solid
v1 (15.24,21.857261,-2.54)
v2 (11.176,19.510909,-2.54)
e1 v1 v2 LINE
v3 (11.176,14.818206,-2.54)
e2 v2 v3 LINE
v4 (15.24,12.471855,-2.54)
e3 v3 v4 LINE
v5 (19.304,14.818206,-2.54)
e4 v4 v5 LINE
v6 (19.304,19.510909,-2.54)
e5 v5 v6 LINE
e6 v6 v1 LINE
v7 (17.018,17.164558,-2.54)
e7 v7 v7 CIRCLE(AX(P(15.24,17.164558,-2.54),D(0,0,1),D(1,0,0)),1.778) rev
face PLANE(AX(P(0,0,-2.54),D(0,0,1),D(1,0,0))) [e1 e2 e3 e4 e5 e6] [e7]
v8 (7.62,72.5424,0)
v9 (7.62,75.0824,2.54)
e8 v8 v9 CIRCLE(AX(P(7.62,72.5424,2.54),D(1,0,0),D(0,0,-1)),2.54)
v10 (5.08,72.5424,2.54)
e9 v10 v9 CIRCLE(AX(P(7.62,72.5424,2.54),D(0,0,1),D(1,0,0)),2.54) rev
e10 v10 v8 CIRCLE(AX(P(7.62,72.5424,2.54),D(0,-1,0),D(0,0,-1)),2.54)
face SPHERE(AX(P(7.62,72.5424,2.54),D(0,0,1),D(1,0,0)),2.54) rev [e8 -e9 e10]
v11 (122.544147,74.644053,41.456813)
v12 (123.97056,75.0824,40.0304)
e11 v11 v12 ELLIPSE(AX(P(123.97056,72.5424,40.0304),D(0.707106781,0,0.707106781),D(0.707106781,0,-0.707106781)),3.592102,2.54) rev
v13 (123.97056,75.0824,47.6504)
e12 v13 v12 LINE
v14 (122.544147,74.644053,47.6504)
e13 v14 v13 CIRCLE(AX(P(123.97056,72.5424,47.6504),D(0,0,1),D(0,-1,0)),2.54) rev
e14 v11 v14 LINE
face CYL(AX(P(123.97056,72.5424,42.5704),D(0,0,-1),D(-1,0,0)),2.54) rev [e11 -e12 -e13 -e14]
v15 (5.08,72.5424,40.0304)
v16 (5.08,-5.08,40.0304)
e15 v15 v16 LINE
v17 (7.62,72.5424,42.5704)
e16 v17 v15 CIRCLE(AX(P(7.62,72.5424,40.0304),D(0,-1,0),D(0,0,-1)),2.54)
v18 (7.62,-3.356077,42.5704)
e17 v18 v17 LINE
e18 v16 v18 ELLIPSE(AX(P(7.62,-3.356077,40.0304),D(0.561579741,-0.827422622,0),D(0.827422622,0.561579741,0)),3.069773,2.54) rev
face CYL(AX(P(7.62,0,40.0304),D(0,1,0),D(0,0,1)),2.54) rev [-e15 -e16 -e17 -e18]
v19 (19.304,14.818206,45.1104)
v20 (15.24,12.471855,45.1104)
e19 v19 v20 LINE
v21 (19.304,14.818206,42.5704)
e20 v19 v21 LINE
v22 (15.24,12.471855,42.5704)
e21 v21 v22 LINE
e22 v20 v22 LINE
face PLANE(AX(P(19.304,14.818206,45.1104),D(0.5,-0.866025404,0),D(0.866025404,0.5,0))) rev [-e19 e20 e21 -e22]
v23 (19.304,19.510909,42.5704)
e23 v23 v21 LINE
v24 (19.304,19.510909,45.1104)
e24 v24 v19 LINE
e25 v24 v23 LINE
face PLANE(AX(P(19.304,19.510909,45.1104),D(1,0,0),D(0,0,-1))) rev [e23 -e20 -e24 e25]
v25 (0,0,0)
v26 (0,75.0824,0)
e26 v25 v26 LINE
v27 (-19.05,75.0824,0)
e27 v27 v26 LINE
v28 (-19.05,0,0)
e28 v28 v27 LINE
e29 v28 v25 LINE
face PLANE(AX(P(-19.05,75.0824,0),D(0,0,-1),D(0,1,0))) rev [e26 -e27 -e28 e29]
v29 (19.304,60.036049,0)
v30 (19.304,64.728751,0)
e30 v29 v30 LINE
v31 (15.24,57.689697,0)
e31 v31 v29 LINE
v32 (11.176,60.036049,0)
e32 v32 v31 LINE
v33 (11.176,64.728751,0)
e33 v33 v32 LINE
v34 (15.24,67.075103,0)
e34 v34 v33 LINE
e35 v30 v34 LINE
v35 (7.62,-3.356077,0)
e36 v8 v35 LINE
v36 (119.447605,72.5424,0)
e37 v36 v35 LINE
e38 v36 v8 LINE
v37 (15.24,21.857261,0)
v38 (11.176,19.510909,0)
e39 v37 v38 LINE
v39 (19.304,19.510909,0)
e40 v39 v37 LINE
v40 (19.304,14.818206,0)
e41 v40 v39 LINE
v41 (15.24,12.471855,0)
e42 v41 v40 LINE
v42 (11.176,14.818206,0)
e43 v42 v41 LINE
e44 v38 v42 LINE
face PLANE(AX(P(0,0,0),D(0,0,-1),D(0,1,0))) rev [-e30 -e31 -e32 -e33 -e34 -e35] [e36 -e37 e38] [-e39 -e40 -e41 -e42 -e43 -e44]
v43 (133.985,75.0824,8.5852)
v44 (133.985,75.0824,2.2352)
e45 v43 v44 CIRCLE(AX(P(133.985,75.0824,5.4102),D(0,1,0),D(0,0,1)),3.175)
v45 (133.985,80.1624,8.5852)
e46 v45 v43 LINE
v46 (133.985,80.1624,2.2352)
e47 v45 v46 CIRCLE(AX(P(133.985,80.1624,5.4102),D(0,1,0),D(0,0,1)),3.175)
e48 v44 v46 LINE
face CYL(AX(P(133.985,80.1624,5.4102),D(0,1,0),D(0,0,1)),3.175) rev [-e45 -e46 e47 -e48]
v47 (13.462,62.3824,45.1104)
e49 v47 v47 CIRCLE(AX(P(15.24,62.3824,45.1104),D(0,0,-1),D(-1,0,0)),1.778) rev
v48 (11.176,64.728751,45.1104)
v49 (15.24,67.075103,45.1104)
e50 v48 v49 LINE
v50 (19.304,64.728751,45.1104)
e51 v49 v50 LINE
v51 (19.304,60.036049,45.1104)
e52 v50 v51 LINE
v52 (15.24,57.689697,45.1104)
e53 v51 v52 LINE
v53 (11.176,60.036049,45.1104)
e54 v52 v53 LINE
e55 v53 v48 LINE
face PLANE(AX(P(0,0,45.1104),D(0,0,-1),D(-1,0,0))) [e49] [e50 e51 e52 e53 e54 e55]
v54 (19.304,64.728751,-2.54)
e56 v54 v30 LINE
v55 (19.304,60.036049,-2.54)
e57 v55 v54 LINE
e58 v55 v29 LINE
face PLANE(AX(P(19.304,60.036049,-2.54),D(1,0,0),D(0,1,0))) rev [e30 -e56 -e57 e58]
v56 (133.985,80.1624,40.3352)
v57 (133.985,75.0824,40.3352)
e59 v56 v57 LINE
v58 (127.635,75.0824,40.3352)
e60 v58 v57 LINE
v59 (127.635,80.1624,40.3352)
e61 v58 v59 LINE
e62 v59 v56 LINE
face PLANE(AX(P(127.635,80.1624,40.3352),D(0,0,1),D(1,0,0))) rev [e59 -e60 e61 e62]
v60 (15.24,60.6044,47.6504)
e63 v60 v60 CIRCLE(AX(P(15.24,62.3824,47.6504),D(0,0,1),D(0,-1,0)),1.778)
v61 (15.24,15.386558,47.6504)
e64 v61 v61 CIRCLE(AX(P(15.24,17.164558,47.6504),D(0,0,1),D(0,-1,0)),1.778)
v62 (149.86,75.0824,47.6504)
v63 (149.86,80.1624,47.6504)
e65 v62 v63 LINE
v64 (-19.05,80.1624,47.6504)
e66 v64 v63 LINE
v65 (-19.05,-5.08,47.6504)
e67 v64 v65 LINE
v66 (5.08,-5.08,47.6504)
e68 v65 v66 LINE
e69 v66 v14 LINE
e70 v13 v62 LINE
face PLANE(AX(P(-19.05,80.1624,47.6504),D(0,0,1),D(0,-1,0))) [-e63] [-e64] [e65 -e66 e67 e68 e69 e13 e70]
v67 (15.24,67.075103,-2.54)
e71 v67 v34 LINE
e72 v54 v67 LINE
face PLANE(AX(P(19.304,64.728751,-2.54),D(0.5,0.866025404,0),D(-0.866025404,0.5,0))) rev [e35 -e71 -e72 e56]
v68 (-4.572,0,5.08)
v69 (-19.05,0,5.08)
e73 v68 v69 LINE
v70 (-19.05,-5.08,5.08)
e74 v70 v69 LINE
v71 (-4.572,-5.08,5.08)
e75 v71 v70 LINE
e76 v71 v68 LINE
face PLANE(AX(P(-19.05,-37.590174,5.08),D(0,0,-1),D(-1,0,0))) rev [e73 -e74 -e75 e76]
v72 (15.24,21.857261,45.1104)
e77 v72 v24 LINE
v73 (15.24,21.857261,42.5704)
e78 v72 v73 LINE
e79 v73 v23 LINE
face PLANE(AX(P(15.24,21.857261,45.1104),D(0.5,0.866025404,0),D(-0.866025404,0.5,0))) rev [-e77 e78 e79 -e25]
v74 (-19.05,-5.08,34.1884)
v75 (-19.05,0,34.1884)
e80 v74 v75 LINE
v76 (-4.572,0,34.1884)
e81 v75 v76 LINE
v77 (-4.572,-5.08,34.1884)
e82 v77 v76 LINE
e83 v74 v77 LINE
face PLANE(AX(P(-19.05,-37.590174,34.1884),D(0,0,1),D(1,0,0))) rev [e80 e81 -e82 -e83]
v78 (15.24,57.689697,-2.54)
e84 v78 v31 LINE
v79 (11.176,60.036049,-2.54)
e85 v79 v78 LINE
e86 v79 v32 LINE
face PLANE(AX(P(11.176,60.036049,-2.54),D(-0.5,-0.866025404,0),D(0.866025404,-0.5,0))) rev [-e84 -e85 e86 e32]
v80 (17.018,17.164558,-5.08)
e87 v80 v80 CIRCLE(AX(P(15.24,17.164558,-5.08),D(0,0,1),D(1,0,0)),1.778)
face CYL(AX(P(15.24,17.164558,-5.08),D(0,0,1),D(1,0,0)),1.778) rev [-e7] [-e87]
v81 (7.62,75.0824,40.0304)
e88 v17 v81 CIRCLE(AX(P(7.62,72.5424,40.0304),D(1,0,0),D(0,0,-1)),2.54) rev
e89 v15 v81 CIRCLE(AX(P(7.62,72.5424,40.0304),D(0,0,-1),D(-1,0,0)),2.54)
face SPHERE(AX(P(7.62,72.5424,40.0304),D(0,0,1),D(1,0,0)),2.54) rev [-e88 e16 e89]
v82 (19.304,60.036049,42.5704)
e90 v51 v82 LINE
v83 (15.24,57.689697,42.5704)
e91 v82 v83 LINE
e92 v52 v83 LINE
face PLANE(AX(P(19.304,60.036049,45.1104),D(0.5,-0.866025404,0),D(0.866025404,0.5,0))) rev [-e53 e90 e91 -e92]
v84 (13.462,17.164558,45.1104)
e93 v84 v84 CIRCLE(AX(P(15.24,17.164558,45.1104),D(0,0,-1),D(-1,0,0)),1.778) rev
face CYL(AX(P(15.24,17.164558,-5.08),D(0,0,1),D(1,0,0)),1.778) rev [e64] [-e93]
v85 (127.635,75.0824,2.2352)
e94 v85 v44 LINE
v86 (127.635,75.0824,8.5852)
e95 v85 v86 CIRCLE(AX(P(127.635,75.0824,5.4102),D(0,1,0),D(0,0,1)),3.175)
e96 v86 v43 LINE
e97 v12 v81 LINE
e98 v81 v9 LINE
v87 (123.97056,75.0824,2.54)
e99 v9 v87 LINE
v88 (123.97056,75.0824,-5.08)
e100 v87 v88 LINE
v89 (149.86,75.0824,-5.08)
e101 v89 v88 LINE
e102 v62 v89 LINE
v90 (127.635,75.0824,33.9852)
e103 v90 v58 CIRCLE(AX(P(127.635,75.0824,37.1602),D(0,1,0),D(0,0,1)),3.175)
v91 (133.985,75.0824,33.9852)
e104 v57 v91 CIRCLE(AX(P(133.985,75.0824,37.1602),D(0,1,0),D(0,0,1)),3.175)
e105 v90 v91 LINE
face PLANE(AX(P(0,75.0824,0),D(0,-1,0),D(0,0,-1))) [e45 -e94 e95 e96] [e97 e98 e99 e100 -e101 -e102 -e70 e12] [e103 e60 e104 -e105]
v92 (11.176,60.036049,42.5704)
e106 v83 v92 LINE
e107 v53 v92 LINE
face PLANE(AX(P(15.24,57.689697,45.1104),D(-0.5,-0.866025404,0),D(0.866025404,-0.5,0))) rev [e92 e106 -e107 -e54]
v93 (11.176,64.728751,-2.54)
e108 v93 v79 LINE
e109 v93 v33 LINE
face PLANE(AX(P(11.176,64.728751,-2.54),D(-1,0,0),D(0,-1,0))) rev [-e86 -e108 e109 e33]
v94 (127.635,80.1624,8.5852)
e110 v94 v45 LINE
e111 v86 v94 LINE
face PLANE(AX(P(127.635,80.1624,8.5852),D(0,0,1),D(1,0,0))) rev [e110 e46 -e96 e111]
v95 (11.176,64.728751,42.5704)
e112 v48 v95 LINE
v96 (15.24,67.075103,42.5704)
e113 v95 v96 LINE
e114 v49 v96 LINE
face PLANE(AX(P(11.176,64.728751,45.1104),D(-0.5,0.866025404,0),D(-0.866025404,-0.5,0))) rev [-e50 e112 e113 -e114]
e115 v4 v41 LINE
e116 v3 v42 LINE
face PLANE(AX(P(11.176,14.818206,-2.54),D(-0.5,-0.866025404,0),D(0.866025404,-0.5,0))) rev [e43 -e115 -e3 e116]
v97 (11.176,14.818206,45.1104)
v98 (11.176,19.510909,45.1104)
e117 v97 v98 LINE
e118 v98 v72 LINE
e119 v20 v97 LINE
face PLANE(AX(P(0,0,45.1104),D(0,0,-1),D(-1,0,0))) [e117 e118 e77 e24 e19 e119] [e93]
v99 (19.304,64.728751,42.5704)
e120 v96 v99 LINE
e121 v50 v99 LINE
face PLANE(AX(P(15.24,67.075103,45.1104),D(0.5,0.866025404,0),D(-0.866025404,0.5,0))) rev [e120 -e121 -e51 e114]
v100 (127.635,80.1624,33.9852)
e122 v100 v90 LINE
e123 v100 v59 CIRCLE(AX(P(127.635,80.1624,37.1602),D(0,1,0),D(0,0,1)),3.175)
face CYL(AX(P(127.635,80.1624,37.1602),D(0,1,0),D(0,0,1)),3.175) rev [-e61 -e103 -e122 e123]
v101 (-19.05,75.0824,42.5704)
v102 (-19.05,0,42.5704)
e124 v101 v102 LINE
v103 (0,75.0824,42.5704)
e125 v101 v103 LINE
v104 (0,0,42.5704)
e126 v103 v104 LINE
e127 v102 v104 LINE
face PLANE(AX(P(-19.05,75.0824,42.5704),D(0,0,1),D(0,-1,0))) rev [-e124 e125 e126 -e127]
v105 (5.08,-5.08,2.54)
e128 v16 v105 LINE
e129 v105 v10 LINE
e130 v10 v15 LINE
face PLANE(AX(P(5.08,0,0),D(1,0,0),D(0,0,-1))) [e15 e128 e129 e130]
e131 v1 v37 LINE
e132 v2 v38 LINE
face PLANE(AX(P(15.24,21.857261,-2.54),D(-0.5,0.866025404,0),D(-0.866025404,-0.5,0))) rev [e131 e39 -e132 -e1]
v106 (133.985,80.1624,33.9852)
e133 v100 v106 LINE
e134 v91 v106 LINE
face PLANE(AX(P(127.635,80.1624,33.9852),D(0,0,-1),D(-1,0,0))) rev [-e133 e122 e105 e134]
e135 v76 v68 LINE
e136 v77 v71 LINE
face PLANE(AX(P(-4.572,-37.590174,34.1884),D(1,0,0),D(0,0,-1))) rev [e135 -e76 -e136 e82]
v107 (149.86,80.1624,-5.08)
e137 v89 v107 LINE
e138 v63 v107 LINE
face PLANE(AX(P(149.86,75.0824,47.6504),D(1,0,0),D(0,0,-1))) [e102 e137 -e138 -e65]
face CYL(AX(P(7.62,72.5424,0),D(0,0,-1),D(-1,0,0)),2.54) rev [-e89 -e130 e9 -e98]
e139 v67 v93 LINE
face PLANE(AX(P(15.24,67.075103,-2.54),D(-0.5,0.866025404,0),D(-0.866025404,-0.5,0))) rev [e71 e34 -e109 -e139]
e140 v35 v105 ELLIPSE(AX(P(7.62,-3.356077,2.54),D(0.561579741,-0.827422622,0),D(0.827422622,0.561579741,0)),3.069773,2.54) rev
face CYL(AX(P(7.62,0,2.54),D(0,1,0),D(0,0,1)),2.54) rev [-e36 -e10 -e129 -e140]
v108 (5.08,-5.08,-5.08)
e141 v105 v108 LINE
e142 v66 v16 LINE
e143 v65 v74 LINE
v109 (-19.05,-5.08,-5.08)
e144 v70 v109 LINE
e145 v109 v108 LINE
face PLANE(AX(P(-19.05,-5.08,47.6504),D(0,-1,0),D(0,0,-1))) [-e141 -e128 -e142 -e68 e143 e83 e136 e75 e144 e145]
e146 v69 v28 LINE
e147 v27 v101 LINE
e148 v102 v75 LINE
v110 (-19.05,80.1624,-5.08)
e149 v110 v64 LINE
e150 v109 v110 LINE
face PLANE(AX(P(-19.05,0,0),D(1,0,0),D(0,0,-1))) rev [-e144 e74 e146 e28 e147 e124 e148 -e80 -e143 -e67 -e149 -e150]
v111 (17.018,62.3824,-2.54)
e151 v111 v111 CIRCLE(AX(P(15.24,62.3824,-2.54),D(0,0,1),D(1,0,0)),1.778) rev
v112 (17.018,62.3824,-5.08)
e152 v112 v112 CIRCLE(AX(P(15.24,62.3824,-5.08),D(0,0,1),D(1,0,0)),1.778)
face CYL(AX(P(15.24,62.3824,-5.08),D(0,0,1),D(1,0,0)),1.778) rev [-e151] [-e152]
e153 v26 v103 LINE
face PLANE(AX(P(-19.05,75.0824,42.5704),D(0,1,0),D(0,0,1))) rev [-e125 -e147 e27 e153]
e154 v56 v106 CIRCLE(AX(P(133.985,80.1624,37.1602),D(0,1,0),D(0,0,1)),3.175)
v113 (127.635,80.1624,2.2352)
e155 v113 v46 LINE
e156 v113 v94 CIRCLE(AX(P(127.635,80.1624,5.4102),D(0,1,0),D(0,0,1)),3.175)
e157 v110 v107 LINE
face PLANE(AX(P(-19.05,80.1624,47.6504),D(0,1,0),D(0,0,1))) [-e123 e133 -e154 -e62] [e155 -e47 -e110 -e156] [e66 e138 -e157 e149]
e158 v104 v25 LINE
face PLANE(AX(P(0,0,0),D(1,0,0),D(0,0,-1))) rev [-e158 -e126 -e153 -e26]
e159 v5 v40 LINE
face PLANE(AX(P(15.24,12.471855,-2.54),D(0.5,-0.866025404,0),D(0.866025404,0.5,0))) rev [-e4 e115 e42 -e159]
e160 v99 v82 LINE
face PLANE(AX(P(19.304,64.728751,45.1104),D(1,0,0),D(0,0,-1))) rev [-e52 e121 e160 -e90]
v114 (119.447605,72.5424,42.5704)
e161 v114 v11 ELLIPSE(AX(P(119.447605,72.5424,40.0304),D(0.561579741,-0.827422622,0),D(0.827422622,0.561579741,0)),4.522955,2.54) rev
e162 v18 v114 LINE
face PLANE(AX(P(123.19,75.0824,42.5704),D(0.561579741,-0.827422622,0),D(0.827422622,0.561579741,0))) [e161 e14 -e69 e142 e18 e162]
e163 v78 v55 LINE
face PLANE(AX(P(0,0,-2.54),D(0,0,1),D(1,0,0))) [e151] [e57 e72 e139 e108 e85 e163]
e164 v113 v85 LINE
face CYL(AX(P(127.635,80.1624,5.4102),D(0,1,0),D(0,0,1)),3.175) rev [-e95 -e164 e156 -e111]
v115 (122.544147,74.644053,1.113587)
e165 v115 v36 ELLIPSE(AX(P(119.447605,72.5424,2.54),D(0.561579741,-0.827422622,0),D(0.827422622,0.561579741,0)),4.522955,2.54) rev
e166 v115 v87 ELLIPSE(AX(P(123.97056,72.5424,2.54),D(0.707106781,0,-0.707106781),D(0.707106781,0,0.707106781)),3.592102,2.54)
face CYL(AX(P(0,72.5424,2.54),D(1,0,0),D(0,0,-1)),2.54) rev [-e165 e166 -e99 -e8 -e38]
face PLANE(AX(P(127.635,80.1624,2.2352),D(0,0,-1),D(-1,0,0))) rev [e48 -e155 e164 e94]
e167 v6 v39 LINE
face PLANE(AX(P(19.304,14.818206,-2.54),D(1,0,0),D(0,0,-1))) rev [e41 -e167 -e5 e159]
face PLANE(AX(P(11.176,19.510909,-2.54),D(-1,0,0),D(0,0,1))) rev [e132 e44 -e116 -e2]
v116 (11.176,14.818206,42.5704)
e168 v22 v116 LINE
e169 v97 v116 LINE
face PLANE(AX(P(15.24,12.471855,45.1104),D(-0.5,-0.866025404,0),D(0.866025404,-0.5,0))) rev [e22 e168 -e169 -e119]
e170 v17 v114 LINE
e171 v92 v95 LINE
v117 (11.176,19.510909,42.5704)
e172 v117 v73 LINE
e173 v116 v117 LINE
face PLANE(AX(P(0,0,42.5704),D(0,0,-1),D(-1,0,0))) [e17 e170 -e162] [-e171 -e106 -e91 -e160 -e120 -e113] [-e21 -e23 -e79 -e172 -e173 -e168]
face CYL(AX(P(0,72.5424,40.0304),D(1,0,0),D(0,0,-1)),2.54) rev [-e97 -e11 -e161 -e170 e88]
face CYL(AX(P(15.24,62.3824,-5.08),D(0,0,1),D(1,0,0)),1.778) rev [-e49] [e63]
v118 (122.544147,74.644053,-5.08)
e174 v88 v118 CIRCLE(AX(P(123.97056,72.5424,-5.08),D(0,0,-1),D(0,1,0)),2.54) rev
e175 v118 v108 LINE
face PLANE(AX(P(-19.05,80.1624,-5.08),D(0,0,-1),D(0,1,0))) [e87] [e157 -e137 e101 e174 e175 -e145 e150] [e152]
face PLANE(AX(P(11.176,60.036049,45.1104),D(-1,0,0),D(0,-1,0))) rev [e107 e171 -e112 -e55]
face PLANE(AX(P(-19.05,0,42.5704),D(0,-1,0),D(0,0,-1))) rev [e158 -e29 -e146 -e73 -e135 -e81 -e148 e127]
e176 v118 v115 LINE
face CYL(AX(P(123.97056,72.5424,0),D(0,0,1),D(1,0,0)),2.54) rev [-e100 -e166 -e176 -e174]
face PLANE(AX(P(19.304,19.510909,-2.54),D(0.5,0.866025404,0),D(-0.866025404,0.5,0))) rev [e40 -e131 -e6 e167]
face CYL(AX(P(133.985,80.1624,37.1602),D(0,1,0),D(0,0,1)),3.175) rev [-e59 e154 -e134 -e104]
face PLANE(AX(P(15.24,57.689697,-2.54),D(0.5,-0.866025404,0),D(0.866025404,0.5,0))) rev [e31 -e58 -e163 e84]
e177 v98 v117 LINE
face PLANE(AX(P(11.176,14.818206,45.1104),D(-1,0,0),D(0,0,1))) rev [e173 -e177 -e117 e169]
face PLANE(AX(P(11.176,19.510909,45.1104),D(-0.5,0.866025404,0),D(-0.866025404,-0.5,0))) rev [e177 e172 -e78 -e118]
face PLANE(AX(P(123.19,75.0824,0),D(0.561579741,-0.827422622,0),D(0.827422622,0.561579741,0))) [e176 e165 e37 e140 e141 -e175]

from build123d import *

# Parameters (mm, degrees)
SKETCH1_W                        = 42.5704
SKETCH1_H                        = 75.0824
TOUCHESLEFTSIDE_DEPTH            = 5.08
SKETCH2_W                        = 52.7304
SKETCH2_H                        = 85.2424
SKETCH2_W_2                      = 42.5704
SKETCH2_H_2                      = 75.0824
ENCLOSES_DEPTH                   = 24.13
SKETCH11_W                       = 14.478
SKETCH11_H                       = 29.1084
WIREGAP_DEPTH                    = 5.08
SKETCH6_W                        = 144.78
SKETCH6_H                        = 52.7304
HORIZONTAL_DEPTH                 = 5.08
UPPERDIAGONAL_DEPTH              = 5.08
LOWERDIAGONAL_DEPTH              = 5.08
F_10_START                       = 75.0824
F_10_0_1935_DIAMETER_SLOT1_DEPTH = 5.08
FILLET1_R                        = 2.54
CROSSBEAMSUPPORTHOLES_DEPTH      = 178.945286698
CROSSBEAMSUPPORTHOLES_DEPTH_BACK = 178.945286698
SKETCH12_R                       = 1.778
NUTEMPLACEMENTS1_DEPTH           = 2.54
NUTEMPLACEMENTS2_DEPTH           = 2.54


# Read off the part's stored shape, not the designer's step: #10 (0.1935) Diameter Slot1
with BuildPart() as part:
    # Sketch1 → TouchesLeftSide (new body)
    with BuildSketch(Plane(origin=(0, 0, 0), x_dir=(0, 0, -1), z_dir=(1, 0, 0))):
        with Locations((-21.2852, 37.5412)):
            Rectangle(SKETCH1_W, SKETCH1_H)
    extrude(amount=TOUCHESLEFTSIDE_DEPTH)

    # Sketch2 → Encloses (add)
    with BuildSketch(Plane(origin=(5.08, 0, 0), x_dir=(0, 0, -1), z_dir=(1, 0, 0))):
        with Locations((-21.2852, 37.5412)):
            Rectangle(SKETCH2_W, SKETCH2_H)
        with Locations((-21.2852, 37.5412)):
            Rectangle(SKETCH2_W_2, SKETCH2_H_2, mode=Mode.SUBTRACT)
    extrude(amount=-ENCLOSES_DEPTH)

    # Sketch11 → WireGap (cut)
    with BuildSketch(Plane(origin=(0, 0, 0), x_dir=(1, 0, 0), z_dir=(0, 1, 0))):
        with Locations((-11.811, -19.6342)):
            Rectangle(SKETCH11_W, SKETCH11_H)
    extrude(amount=-WIREGAP_DEPTH, mode=Mode.SUBTRACT)

    # Sketch6 → Horizontal (add)
    with BuildSketch(Plane(origin=(0, 80.1624, 0), x_dir=(1, 0, 0), z_dir=(0, 1, 0))):
        with Locations((77.47, -21.2852)):
            Rectangle(SKETCH6_W, SKETCH6_H)
    extrude(amount=-HORIZONTAL_DEPTH)

    # Sketch7 → UpperDiagonal (add)
    with BuildSketch(Plane.XY.offset(47.6504)):
        Polygon((5.08, -5.08), (5.08, 75.0824), (123.19, 75.0824), align=None)
    extrude(amount=-UPPERDIAGONAL_DEPTH)

    # Sketch8 → LowerDiagonal (add)
    with BuildSketch(Plane(origin=(0, 0, -5.08), x_dir=(-1, 0, 0), z_dir=(0, 0, -1))):
        Polygon((-5.08, -5.08), (-5.08, 75.0824), (-123.19, 75.0824), align=None)
    extrude(amount=-LOWERDIAGONAL_DEPTH)

    # #10 (0.1935) Diameter Slot1 outline → #10 (0.1935) Diameter Slot1 (cut)
    with BuildSketch(Plane(origin=(0, 0, 0), x_dir=(1, 0, 0), z_dir=(0, 1, 0)).offset(F_10_START)):
        with BuildLine():
            Line((127.635, -8.5852), (133.985, -8.5852))
            ThreePointArc((133.985, -8.5852), (137.16, -5.4102), (133.985, -2.2352))
            Line((133.985, -2.2352), (127.635, -2.2352))
            ThreePointArc((127.635, -2.2352), (124.46, -5.4102), (127.635, -8.5852))
        make_face()
        with BuildLine():
            Line((127.635, -40.3352), (133.985, -40.3352))
            ThreePointArc((133.985, -40.3352), (137.16, -37.1602), (133.985, -33.9852))
            Line((133.985, -33.9852), (127.635, -33.9852))
            ThreePointArc((127.635, -33.9852), (124.46, -37.1602), (127.635, -40.3352))
        make_face()
    extrude(amount=F_10_0_1935_DIAMETER_SLOT1_DEPTH, mode=Mode.SUBTRACT)

    # Fillet1
    fillet1_edges = [part.edges().sort_by_distance(p)[0] for p in [
        (123.19, 75.0824, 45.1104),
        (5.08, 35.0012, 42.5704),
        (64.135, 75.0824, 42.5704),
        (5.08, 75.0824, 21.2852),
        (64.135, 75.0824, 0),
        (123.19, 75.0824, -2.54),
        (5.08, 35.0012, 0),
    ]]
    fillet(fillet1_edges, radius=FILLET1_R)

    # Sketch12 → CrossbeamSupportHoles (cut, two sides: drawn at the far end of the back side and taken through both)
    with BuildSketch(Plane.XY.offset(47.6504).offset(-CROSSBEAMSUPPORTHOLES_DEPTH_BACK)):
        with Locations((15.24, 17.164557597)):
            Circle(SKETCH12_R)
        with Locations((15.24, 62.3824)):
            Circle(SKETCH12_R)
    extrude(amount=CROSSBEAMSUPPORTHOLES_DEPTH + CROSSBEAMSUPPORTHOLES_DEPTH_BACK, mode=Mode.SUBTRACT)

    # Sketch13 → NutEmplacements1 (cut)
    with BuildSketch(Plane(origin=(0, 0, 42.5704), x_dir=(-1, 0, 0), z_dir=(0, 0, -1))):
        Polygon((-19.304, 14.818206103), (-15.24, 12.471854609), (-11.176, 14.818206103), (-11.176, 19.510909091), (-15.24, 21.857260585), (-19.304, 19.510909091), align=None)
        Polygon((-15.24, 57.689697012), (-11.176, 60.036048506), (-11.176, 64.728751494), (-15.24, 67.075102988), (-19.304, 64.728751494), (-19.304, 60.036048506), align=None)
    extrude(amount=-NUTEMPLACEMENTS1_DEPTH, mode=Mode.SUBTRACT)

    # Sketch14 → NutEmplacements2 (cut)
    with BuildSketch(Plane.XY):
        Polygon((15.24, 21.857260585), (11.176, 19.510909091), (11.176, 14.818206103), (15.24, 12.471854609), (19.304, 14.818206103), (19.304, 19.510909091), align=None)
        Polygon((15.24, 57.689697012), (19.304, 60.036048506), (19.304, 64.728751494), (15.24, 67.075102988), (11.176, 64.728751494), (11.176, 60.036048506), align=None)
    extrude(amount=-NUTEMPLACEMENTS2_DEPTH, mode=Mode.SUBTRACT)


solid = part.part
